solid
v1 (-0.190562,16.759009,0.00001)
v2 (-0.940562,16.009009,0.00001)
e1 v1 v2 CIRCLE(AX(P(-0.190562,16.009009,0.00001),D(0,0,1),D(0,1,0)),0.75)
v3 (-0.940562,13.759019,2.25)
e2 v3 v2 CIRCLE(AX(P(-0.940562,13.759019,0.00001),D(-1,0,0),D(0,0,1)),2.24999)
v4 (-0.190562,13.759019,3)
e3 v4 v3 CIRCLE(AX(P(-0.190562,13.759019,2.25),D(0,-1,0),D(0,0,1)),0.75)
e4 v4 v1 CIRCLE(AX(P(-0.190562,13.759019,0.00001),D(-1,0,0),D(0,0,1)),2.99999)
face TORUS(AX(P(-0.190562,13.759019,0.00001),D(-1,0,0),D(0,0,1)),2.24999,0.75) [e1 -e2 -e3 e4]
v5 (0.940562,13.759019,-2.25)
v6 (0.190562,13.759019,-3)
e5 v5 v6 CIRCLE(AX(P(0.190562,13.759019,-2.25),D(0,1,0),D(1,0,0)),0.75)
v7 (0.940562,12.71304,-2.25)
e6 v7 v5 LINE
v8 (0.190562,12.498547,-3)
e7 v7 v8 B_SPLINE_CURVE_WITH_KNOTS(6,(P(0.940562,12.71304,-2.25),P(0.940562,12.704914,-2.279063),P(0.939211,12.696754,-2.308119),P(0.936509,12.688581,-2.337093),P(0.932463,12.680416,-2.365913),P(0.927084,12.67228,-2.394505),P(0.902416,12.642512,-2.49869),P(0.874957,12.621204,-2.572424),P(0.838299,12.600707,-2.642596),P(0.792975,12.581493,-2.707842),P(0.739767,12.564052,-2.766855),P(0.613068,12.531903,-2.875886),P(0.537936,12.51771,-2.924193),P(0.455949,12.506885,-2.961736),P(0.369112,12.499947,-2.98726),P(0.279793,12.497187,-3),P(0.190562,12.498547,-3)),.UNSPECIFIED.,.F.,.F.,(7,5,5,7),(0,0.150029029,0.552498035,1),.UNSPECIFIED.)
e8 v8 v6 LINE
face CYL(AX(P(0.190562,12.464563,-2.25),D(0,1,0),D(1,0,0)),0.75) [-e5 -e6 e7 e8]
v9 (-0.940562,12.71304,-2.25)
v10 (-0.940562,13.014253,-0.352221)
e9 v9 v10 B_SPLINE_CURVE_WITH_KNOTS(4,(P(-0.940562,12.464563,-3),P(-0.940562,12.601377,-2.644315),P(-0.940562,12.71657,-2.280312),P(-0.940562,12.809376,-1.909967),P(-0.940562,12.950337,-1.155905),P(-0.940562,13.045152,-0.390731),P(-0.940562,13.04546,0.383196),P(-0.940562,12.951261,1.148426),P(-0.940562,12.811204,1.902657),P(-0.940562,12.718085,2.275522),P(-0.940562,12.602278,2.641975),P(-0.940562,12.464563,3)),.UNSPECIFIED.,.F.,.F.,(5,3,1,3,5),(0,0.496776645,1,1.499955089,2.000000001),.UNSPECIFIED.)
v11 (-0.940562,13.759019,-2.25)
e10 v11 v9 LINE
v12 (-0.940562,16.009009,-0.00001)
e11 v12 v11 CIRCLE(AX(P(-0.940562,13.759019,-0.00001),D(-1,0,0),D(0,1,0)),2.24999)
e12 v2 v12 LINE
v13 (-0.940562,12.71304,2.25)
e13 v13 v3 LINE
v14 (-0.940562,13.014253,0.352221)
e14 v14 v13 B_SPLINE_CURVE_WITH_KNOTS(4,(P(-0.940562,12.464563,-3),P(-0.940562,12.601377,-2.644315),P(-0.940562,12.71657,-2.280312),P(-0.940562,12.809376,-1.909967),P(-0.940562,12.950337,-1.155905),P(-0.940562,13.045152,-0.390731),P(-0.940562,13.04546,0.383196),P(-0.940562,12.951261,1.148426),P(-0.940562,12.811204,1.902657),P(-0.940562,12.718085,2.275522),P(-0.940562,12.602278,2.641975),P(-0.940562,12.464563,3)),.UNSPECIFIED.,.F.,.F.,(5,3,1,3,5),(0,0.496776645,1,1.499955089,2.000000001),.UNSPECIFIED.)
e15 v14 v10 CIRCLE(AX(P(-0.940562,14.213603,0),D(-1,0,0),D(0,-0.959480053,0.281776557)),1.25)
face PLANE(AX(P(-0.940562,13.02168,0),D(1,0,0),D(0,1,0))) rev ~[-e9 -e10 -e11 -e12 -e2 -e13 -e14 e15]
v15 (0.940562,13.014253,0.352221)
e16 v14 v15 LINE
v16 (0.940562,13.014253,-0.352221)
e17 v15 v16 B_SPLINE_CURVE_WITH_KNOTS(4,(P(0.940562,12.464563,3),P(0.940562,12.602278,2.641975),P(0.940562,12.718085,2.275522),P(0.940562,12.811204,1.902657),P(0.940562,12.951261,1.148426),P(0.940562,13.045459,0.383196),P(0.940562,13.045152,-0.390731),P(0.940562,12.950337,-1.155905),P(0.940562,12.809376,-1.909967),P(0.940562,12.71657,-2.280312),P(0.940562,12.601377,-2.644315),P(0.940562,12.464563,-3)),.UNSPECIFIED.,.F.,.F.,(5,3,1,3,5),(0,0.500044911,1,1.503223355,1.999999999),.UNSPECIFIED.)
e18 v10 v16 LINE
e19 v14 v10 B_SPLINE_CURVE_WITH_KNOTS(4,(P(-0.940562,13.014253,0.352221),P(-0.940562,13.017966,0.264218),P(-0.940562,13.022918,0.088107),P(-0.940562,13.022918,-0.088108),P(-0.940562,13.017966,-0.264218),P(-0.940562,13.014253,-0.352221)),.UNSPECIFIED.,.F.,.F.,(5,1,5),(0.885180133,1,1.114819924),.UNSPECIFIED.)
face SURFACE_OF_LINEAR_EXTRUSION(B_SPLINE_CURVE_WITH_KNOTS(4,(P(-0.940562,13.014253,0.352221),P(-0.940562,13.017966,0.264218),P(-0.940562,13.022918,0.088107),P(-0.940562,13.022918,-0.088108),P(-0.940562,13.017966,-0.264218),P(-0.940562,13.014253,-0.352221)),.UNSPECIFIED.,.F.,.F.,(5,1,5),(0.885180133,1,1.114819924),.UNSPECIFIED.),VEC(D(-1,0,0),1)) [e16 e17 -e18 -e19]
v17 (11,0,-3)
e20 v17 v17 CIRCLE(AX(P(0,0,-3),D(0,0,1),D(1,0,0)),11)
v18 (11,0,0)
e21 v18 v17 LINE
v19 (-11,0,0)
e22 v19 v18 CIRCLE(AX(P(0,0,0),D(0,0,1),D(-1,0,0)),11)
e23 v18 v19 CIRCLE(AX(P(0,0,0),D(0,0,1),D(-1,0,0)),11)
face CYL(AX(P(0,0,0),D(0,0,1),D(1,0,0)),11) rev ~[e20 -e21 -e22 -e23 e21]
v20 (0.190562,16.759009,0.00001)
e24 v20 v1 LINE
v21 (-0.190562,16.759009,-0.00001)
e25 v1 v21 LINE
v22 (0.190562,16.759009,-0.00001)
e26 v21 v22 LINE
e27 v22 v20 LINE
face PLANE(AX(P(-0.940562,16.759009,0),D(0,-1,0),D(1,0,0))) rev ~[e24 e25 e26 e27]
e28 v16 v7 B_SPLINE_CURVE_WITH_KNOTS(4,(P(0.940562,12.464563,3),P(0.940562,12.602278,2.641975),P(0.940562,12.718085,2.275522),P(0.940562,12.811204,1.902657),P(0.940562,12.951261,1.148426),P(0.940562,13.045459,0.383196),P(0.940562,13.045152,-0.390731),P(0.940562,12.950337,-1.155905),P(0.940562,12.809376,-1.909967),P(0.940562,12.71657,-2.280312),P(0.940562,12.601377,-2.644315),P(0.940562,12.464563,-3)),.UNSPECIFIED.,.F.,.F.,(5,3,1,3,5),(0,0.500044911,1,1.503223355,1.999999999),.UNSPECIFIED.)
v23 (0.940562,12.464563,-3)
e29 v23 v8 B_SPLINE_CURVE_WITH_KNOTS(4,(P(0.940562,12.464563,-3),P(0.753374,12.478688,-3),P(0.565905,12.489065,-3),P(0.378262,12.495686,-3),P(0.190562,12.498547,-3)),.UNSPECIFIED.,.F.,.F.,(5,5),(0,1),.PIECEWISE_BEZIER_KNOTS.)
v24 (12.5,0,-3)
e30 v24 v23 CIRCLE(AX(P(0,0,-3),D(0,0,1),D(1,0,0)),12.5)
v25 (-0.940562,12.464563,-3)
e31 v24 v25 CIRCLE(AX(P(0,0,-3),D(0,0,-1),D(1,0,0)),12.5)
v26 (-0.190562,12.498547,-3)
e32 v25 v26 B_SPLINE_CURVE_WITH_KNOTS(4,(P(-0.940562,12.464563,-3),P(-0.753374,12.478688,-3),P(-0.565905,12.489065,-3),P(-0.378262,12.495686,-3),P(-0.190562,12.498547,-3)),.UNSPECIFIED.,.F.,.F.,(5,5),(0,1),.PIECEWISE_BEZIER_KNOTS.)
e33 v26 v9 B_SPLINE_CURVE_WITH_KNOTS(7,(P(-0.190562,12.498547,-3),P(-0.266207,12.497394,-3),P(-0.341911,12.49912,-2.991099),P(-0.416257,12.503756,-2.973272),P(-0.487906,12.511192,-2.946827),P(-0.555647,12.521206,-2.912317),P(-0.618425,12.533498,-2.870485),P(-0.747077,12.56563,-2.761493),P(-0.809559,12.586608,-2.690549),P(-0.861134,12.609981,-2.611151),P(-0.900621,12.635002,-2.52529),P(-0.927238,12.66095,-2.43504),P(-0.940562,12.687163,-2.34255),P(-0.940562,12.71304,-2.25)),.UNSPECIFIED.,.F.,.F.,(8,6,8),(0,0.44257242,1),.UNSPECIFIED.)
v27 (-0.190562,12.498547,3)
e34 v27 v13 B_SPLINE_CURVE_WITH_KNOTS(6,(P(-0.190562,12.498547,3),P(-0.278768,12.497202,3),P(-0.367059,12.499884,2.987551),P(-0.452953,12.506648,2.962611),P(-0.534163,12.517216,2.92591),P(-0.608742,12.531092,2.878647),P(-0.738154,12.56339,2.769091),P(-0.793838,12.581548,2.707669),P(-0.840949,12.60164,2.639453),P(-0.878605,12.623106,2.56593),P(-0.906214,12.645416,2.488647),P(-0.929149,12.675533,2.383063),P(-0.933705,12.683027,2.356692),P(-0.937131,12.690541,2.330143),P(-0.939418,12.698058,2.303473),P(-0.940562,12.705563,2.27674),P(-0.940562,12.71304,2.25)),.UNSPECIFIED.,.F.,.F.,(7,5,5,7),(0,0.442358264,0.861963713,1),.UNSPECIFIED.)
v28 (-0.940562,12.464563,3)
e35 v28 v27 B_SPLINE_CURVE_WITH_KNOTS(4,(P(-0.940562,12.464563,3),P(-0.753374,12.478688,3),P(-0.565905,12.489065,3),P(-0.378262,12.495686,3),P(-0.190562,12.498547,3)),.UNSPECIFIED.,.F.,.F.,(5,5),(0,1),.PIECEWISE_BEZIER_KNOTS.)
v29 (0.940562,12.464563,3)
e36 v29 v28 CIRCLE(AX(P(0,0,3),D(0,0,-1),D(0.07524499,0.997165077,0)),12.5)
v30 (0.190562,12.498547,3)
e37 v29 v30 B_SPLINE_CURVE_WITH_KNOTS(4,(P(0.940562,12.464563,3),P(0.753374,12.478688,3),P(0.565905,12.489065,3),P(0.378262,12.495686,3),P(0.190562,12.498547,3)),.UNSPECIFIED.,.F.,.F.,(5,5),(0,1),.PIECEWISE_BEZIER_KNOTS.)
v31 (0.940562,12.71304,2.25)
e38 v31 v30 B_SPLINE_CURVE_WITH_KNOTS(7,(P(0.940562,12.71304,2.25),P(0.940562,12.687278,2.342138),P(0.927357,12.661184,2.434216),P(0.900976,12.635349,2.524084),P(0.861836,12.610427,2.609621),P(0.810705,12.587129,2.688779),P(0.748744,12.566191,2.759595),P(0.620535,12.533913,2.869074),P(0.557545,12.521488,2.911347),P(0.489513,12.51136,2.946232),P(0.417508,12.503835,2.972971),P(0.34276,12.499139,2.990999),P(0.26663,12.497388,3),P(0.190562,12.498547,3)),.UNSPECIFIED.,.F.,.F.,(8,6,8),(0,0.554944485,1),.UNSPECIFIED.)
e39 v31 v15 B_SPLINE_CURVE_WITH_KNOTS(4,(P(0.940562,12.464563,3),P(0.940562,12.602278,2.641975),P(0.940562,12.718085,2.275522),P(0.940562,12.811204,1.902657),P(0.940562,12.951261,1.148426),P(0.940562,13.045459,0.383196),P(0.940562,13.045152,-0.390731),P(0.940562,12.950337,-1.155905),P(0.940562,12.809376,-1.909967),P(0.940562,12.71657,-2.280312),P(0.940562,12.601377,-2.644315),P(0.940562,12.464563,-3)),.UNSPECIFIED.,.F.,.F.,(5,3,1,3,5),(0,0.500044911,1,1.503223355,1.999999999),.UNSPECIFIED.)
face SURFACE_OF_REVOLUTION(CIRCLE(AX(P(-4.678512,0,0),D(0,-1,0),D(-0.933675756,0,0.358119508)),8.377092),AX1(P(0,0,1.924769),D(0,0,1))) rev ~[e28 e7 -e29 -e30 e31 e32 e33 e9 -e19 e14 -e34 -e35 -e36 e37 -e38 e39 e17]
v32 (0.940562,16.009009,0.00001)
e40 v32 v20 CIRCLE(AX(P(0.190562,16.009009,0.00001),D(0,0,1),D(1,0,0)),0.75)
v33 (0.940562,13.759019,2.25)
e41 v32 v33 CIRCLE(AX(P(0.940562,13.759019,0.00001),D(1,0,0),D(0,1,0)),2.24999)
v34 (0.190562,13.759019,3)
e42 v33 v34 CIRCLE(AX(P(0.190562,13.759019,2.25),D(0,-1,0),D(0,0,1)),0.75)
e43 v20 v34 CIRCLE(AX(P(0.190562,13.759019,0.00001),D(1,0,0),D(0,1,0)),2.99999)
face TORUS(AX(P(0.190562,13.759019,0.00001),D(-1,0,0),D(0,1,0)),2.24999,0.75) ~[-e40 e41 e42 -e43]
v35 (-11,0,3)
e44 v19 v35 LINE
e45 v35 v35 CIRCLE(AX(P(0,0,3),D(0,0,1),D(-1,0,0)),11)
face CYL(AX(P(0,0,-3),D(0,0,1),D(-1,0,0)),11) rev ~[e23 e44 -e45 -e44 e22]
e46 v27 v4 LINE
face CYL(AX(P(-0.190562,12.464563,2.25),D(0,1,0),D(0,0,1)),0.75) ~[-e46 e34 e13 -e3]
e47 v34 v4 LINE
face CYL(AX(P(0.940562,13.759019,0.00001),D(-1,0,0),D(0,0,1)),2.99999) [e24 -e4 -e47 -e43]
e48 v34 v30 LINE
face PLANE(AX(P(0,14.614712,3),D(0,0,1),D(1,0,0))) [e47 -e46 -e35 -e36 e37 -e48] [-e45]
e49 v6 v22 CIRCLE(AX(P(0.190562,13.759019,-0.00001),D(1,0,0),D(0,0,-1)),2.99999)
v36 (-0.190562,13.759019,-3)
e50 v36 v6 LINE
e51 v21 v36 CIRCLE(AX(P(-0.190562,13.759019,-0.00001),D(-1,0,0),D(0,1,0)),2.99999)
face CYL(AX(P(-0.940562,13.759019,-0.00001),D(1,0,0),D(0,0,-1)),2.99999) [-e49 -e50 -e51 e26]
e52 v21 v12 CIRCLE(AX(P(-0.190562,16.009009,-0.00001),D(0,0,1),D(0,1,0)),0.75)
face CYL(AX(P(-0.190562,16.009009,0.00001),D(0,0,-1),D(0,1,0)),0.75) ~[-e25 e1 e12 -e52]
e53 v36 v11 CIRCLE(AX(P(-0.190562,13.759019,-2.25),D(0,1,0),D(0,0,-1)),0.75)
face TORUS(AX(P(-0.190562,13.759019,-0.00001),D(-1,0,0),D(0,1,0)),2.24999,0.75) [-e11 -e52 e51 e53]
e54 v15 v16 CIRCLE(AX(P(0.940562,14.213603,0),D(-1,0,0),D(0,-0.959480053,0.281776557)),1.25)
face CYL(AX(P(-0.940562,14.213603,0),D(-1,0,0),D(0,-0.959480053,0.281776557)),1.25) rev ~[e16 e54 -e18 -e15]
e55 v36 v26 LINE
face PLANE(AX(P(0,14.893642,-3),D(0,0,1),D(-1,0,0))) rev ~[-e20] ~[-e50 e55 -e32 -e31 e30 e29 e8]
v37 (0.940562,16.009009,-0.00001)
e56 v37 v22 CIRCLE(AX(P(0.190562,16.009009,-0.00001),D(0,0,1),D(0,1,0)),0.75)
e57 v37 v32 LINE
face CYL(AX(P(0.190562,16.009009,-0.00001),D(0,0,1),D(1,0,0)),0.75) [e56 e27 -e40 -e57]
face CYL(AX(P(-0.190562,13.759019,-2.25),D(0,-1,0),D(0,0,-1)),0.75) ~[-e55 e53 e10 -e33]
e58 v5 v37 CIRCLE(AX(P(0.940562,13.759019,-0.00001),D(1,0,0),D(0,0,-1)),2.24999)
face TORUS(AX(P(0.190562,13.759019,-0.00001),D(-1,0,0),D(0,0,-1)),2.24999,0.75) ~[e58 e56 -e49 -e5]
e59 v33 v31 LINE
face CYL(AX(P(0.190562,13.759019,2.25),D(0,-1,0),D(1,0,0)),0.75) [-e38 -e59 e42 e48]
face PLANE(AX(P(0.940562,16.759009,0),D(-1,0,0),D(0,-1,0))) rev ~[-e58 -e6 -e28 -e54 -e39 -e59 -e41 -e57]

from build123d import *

# Parameters (mm, degrees)
F3_DEPTH  = 3
F4_DEPTH  = 3
F5_R      = 2.99999
F6_R      = 0.75
F8_DEPTH  = 2
F9_R      = 11
F10_DEPTH = 25


# Not quite as in the source:
# - a fillet or chamfer is up to 0.001 mm smaller than in the source, because OpenCascade refuses the exact size


with BuildPart() as f1:
    # F0 (on Front) → F1 (revolve)
    with BuildSketch(Plane.XZ):
        with BuildLine():
            Line((-11, 0), (-11, 3))
            Line((-11, 3), (-12.5, 3))
            ThreePointArc((-12.5, 3), (-13.0556042785, 0), (-12.5, -3))
            Line((-12.5, -3), (-11, -3))
            Line((-11, -3), (-11, 0))
        make_face()
    revolve(axis=Axis((0, 0, 1.9247694872), (0, 0, 1)))

    # F2 (on Top) → F3 (join)
    with BuildSketch(Plane.XY):
        with BuildLine():
            Line((0.9405623698, 12.4645634672), (0.9405623698, 16.7590089038))
            Line((0.9405623698, 16.7590089038), (-0.9405623698, 16.7590089038))
            Line((-0.9405623698, 16.7590089038), (-0.9405623698, 12.4645634672))
            ThreePointArc((-0.9405623698, 12.4645634672), (0, 12.5), (0.9405623698, 12.4645634672))
        make_face()
    extrude(amount=F3_DEPTH)

    # F3_face (on face) + F2 (on Top) → F4 (join)
    with BuildSketch(Plane(origin=(0, 14.9016416929, 0), x_dir=(1, 0, 0), z_dir=(0, 0, -1))):
        with BuildLine():
            add(Edge.make_bspline(
                [(-0.9405623698, 1.8799618663), (-0.4710967186, 1.8460521303), (0, 1.8347096394), (0.4710967186, 1.8460521303), (0.9405623698, 1.8799618663)],
                knots=[0, 0, 0, 0, 0, 1, 1, 1, 1, 1], degree=4))
            Line((-0.9405623698, 1.8799618663), (-0.9405623698, -1.8573672109))
            Line((-0.9405623698, -1.8573672109), (0.9405623698, -1.8573672109))
            Line((0.9405623698, -1.8573672109), (0.9405623698, 1.8799618663))
        make_face()
    with BuildSketch(Plane.XY):
        with BuildLine():
            Line((0.9405623698, 12.4645634672), (0.9405623698, 16.7590089038))
            Line((0.9405623698, 16.7590089038), (-0.9405623698, 16.7590089038))
            Line((-0.9405623698, 16.7590089038), (-0.9405623698, 12.4645634672))
            ThreePointArc((-0.9405623698, 12.4645634672), (0, 12.5), (0.9405623698, 12.4645634672))
        make_face()
        with BuildLine():
            ThreePointArc((12.5, 0), (9.1653431366, 8.4997932439), (0.9405623698, 12.4645634672))
            ThreePointArc((0.9405623698, 12.4645634672), (0, 12.5), (-0.9405623698, 12.4645634672))
            ThreePointArc((-0.9405623698, 12.4645634672), (-8.4997932439, -9.1653431366), (12.5, 0))
        make_face()
    extrude(amount=F4_DEPTH, dir=(0, 0, -1))

    # F5 (radius 3 in the source; OpenCascade refuses exactly that, so slightly less here)
    f5_edges = [f1.edges().sort_by_distance(p)[0] for p in [
        (0, 16.759009, 3),
        (0, 16.759009, -3),
    ]]
    fillet(f5_edges, radius=F5_R)

    # F6
    f6_edges = [f1.edges().sort_by_distance(p)[0] for p in [
        (0.940562, 13.111791, -3),
        (0.940562, 15.880332, 2.121323),
        (-0.940562, 15.880332, 2.121323),
        (-0.940562, 13.111791, 3),
        (-0.940562, 13.111791, -3),
    ]]
    fillet(f6_edges, radius=F6_R)

    # F7 (on face) → F8 (cut)
    with BuildSketch(Plane(origin=(-0.9405623698, 0, 0), x_dir=(0, -1, 0), z_dir=(-1, 0, 0))):
        with BuildLine():
            add(Edge.make_bspline(
                [(-13.0142525221, 0.3522206963), (-13.0179655917, 0.2642177815), (-13.0229178327, 0.0881074317), (-13.0229178526, -0.0881075807), (-13.01796564, -0.2642179295), (-13.0142525781, -0.352220887)],
                knots=[0.8851801326, 0.8851801326, 0.8851801326, 0.8851801326, 0.8851801326, 1, 1.1148199242, 1.1148199242, 1.1148199242, 1.1148199242, 1.1148199242], degree=4))
            ThreePointArc((-13.0142525221, 0.3522206963), (-15.4636025882, 9.94e-08), (-13.0142525781, -0.352220887))
        make_face()
    extrude(amount=-F8_DEPTH, mode=Mode.SUBTRACT)

    # F9 (on face) → F10 (cut)
    with BuildSketch(Plane.XY):
        Circle(F9_R)
    extrude(amount=-F10_DEPTH, mode=Mode.SUBTRACT)


solid = f1.part
